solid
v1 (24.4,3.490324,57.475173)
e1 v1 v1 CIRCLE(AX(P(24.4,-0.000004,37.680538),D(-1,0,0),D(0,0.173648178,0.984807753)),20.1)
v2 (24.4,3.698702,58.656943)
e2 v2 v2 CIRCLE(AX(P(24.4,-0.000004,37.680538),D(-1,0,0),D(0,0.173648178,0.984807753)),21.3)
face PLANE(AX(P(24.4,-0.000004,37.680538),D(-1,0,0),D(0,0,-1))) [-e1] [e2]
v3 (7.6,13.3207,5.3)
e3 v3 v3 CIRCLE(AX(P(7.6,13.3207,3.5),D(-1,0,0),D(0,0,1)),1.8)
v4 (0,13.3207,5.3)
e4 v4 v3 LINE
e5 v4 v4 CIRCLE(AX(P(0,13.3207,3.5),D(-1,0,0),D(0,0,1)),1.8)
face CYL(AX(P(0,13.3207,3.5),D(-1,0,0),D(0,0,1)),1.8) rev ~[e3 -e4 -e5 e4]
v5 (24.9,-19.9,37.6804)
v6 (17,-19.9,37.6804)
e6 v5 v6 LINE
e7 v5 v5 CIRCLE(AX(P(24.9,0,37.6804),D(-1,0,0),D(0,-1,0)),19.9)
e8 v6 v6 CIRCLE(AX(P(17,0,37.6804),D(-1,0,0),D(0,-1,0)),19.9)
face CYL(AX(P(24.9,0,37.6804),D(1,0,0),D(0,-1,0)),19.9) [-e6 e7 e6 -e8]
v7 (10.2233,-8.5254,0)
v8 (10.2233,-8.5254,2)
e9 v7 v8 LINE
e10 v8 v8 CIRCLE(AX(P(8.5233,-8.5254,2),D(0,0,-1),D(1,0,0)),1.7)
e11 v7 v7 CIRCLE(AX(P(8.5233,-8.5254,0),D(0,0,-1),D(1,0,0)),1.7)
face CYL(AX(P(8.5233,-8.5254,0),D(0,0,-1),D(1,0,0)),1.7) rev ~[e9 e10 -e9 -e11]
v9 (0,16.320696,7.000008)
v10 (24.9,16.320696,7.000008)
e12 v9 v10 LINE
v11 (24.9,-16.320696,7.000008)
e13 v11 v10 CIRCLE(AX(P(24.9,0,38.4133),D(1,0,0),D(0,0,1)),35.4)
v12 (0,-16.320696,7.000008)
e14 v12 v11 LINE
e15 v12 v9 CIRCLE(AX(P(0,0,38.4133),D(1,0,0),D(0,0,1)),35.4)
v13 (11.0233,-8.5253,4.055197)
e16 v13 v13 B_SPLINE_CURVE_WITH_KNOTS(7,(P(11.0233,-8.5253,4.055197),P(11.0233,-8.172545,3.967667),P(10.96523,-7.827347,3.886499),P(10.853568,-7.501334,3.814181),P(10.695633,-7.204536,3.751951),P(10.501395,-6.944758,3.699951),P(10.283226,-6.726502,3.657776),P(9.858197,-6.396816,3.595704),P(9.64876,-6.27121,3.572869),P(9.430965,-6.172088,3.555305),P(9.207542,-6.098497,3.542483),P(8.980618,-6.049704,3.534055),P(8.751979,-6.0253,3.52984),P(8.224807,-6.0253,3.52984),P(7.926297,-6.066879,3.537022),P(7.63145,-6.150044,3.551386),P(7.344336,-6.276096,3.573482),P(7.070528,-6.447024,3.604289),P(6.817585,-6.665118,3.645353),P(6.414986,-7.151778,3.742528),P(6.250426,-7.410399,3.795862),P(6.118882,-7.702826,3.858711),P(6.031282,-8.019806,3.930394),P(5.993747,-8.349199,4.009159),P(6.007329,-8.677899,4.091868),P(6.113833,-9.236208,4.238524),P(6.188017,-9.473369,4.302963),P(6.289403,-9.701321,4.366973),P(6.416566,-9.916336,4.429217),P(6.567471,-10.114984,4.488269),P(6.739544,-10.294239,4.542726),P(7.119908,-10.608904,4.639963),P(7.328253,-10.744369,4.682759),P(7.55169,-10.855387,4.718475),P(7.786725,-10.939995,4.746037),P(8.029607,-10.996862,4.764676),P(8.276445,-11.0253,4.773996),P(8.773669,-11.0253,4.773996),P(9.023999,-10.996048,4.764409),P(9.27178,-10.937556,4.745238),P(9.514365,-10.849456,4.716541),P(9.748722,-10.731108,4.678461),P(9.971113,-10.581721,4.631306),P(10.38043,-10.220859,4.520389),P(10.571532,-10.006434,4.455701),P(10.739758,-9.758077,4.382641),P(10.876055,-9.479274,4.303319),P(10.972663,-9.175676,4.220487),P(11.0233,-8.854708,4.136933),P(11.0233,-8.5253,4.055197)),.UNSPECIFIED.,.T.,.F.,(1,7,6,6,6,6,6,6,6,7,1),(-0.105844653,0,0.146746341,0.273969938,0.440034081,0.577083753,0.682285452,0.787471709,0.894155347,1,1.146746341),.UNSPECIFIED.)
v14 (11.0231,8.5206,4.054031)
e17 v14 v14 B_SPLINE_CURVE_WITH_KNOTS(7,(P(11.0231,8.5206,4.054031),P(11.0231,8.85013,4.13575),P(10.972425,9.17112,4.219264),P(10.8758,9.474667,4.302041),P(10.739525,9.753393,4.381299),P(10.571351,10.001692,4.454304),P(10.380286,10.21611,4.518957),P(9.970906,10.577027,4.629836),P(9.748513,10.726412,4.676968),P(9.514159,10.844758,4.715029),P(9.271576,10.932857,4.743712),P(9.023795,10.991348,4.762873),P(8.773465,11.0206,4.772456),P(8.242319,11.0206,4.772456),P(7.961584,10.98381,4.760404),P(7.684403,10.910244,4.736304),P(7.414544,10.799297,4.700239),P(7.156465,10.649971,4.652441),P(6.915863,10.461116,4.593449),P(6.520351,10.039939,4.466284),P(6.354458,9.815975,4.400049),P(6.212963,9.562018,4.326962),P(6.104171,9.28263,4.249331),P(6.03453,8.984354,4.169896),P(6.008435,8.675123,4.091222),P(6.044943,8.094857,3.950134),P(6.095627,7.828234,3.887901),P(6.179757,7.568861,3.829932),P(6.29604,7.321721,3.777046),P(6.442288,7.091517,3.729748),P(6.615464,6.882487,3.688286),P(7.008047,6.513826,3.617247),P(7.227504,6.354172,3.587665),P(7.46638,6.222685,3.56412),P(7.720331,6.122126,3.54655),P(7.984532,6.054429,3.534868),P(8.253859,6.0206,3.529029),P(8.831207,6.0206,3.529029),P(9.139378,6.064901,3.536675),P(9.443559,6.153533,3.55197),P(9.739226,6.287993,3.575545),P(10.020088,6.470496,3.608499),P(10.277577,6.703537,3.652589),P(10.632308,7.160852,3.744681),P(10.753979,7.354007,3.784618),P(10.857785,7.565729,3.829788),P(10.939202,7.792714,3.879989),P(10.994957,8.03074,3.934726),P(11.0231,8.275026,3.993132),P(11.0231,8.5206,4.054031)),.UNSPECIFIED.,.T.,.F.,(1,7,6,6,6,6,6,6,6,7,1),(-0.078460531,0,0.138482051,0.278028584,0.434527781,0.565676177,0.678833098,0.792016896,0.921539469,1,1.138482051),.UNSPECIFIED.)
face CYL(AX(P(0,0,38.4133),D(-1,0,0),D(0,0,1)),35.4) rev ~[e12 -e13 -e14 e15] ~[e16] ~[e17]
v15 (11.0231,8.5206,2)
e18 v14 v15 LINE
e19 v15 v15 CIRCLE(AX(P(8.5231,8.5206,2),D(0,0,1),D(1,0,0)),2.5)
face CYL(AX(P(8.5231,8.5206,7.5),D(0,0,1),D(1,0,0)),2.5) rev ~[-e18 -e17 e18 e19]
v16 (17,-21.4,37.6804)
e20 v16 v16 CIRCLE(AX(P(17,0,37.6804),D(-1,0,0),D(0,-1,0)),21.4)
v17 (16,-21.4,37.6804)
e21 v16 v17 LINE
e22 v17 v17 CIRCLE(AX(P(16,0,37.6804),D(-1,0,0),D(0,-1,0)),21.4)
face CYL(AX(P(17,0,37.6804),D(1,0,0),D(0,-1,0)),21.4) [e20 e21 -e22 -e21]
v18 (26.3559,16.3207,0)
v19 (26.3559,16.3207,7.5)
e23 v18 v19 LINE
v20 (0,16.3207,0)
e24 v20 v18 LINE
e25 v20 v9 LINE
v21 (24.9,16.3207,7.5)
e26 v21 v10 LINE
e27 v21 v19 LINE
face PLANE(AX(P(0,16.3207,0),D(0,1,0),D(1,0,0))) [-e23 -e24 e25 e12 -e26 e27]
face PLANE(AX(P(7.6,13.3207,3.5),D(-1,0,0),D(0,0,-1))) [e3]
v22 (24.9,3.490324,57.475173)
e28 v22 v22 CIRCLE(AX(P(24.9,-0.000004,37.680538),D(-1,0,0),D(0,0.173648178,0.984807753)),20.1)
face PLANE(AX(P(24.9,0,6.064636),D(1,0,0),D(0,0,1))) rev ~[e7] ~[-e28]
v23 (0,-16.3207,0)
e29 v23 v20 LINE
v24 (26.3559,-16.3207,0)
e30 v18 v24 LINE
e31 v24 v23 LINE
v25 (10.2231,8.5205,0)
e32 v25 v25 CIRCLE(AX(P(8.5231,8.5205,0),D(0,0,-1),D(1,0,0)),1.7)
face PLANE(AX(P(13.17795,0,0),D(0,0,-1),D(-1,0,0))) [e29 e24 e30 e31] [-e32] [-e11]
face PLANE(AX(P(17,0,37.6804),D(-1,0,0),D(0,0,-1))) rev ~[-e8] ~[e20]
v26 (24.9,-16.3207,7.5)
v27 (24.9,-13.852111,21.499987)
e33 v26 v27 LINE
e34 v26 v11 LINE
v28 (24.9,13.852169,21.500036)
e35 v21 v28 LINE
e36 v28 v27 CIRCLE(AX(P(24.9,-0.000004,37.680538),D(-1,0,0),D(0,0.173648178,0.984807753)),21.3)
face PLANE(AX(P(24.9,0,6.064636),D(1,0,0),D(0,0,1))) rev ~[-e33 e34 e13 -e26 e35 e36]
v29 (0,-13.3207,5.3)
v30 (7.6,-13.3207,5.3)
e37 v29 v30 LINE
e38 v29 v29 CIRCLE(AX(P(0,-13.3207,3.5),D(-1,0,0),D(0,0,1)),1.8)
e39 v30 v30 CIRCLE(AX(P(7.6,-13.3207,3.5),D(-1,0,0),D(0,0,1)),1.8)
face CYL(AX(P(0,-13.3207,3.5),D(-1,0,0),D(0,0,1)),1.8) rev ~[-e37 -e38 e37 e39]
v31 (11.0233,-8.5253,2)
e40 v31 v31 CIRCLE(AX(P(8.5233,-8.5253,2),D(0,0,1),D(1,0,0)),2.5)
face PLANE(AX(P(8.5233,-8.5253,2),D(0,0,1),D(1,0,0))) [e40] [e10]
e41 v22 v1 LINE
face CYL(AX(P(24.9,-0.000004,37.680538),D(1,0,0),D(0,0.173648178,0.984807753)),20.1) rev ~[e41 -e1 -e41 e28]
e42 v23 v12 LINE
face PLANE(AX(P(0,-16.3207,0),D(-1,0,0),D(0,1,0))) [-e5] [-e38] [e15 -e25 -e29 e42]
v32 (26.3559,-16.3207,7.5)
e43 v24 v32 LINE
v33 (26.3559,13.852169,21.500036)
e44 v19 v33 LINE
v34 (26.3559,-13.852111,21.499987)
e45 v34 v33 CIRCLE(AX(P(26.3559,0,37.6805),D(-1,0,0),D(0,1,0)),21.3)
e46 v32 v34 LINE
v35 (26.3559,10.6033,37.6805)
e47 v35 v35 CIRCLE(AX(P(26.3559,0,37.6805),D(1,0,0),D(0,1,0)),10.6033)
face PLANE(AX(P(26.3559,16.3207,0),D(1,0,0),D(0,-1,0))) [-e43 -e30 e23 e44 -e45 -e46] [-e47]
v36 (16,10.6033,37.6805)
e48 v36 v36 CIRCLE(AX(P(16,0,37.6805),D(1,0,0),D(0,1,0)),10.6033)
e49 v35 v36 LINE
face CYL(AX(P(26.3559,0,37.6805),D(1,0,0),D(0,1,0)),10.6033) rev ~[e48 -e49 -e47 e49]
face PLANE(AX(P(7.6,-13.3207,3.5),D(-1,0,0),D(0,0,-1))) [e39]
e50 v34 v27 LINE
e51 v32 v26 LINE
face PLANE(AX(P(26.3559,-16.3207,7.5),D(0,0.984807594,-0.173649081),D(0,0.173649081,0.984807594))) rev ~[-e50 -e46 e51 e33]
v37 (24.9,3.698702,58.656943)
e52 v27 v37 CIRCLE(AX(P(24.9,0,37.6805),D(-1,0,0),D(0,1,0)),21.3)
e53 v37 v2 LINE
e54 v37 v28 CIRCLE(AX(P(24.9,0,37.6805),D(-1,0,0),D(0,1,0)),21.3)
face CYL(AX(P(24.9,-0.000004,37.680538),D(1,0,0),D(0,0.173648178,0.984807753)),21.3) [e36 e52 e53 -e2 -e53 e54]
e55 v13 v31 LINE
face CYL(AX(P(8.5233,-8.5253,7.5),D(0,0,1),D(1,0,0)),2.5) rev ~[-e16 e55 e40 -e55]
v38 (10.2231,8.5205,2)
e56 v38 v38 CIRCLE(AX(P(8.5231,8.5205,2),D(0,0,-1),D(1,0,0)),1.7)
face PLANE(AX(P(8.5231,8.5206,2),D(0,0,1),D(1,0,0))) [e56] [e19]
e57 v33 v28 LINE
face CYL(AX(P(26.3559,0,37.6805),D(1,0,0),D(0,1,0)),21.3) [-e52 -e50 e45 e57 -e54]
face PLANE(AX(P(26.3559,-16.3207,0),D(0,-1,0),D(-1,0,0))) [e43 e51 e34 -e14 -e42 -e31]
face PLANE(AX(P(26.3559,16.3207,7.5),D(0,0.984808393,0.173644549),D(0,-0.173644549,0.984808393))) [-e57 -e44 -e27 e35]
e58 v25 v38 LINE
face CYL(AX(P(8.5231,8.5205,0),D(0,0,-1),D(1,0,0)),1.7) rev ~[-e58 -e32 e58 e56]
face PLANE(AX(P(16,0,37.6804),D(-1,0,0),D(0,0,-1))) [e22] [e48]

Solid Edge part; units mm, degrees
sketch "Sketch1" plane through (0, 0, 0) normal (0, 0, 1) x (1, 0, 0)
  line L0 (0, -16.3207) -> (0, 16.3207)
  line L1 (0, 16.3207) -> (26.3559, 16.3207)
  line L2 (26.3559, 16.3207) -> (26.3559, -16.3207)
  line L3 (26.3559, -16.3207) -> (0, -16.3207)
extrude "Protrusion1" add sketch "Sketch1" along normal up to vertex (7.5 mm away)
sketch "Sketch2" plane through (0, 12.45, 7.5) normal (0, 0, 1) x (1, 0, 0)
  circle A0 centre (8.5231, -3.9294) radius 2.5
  circle A1 centre (8.5233, -20.9753) radius 2.5
extrude "Cutout1" cut sketch "Sketch2" against normal blind 5.5
sketch "Sketch3" plane through (0, 0, 3.5) normal (-1, 0, 0) x (0, 0, 1)
  line L0 (4, 16.3207) -> (4, -16.3207)
  line L1 (4, -16.3207) -> (3.5, -16.3207)
  arc A0 (3.5, -16.3207) -> (3.5, 16.3207) centre (34.9133, 0) cw
  line L2 (4, 16.3207) -> (3.5, 16.3207)
extrude "Cutout2" cut sketch "Sketch3" against normal blind 24.9
sketch "Sketch4" plane through (26.3559, 27.5207, 3.5) normal (1, 0, 0) x (0, 1, 0)
  line L0 (-43.8414, 4) -> (-43.8414, -3.5)
  line L1 (-43.8414, -3.5) -> (-11.2, -3.5)
  line L2 (-11.2, -3.5) -> (-11.2, 4)
  line L3 (-11.2, 4) -> (-13.6685, 18)
  arc A0 (-41.3728, 18) -> (-13.6685, 18) centre (-27.5207, 34.1805) cw
  line L4 (-43.8414, 4) -> (-41.3728, 18)
extrude "Protrusion2" add sketch "Sketch4" against normal up to vertex (1.4559 mm away)
sketch "Sketch5" plane through (0, 13.7603, 0) normal (0, 0, -1) x (1, 0, 0)
  circle A0 centre (8.5233, 22.2857) radius 1.7
  circle A1 centre (8.5231, 5.2398) radius 1.7
extrude "Cutout3" cut sketch "Sketch5" against normal up to next
sketch "Sketch6" plane through (0, 0, 3.5) normal (-1, 0, 0) x (0, 0, 1)
  circle A0 centre (0, -13.3207) radius 1.8
  circle A1 centre (0, 13.3207) radius 1.8
extrude "Cutout4" cut sketch "Sketch6" against normal blind 7.6
sketch "Sketch7" plane through (24.9, 24.9, 30.7298) normal (-1, 0, 0) x (0, 0.1736482, 0.9848078)
  circle A0 centre (2.5213, -25.7287) radius 21.3
  circle A1 centre (2.5213, -25.7287) radius 20.1
  dimension "D1" = 1.2
extrude "Protrusion3" add sketch "Sketch7" along normal blind 0.5
sketch "Sketch8" plane through (24.9, 24.9, 38.9028) normal (-1, 0, 0) x (0, -1, 0)
  circle A0 centre (24.9, -1.2224) radius 19.9
  dimension "D1" = 0.2
extrude "Protrusion4" add sketch "Sketch8" along normal blind 7.9
sketch "Sketch9" plane through (17, 17, 38.9028) normal (-1, 0, 0) x (0, -1, 0)
  circle A0 centre (17, -1.2224) radius 21.4
  dimension "D1" = 1.5
extrude "Protrusion5" add sketch "Sketch9" along normal blind 1
sketch "Sketch10" plane through (26.3559, 27.5207, 10.5562) normal (1, 0, 0) x (0, 1, 0)
  circle A0 centre (-27.5207, 27.1243) radius 10.6033
extrude "Cutout5" cut sketch "Sketch10" against normal up to next
